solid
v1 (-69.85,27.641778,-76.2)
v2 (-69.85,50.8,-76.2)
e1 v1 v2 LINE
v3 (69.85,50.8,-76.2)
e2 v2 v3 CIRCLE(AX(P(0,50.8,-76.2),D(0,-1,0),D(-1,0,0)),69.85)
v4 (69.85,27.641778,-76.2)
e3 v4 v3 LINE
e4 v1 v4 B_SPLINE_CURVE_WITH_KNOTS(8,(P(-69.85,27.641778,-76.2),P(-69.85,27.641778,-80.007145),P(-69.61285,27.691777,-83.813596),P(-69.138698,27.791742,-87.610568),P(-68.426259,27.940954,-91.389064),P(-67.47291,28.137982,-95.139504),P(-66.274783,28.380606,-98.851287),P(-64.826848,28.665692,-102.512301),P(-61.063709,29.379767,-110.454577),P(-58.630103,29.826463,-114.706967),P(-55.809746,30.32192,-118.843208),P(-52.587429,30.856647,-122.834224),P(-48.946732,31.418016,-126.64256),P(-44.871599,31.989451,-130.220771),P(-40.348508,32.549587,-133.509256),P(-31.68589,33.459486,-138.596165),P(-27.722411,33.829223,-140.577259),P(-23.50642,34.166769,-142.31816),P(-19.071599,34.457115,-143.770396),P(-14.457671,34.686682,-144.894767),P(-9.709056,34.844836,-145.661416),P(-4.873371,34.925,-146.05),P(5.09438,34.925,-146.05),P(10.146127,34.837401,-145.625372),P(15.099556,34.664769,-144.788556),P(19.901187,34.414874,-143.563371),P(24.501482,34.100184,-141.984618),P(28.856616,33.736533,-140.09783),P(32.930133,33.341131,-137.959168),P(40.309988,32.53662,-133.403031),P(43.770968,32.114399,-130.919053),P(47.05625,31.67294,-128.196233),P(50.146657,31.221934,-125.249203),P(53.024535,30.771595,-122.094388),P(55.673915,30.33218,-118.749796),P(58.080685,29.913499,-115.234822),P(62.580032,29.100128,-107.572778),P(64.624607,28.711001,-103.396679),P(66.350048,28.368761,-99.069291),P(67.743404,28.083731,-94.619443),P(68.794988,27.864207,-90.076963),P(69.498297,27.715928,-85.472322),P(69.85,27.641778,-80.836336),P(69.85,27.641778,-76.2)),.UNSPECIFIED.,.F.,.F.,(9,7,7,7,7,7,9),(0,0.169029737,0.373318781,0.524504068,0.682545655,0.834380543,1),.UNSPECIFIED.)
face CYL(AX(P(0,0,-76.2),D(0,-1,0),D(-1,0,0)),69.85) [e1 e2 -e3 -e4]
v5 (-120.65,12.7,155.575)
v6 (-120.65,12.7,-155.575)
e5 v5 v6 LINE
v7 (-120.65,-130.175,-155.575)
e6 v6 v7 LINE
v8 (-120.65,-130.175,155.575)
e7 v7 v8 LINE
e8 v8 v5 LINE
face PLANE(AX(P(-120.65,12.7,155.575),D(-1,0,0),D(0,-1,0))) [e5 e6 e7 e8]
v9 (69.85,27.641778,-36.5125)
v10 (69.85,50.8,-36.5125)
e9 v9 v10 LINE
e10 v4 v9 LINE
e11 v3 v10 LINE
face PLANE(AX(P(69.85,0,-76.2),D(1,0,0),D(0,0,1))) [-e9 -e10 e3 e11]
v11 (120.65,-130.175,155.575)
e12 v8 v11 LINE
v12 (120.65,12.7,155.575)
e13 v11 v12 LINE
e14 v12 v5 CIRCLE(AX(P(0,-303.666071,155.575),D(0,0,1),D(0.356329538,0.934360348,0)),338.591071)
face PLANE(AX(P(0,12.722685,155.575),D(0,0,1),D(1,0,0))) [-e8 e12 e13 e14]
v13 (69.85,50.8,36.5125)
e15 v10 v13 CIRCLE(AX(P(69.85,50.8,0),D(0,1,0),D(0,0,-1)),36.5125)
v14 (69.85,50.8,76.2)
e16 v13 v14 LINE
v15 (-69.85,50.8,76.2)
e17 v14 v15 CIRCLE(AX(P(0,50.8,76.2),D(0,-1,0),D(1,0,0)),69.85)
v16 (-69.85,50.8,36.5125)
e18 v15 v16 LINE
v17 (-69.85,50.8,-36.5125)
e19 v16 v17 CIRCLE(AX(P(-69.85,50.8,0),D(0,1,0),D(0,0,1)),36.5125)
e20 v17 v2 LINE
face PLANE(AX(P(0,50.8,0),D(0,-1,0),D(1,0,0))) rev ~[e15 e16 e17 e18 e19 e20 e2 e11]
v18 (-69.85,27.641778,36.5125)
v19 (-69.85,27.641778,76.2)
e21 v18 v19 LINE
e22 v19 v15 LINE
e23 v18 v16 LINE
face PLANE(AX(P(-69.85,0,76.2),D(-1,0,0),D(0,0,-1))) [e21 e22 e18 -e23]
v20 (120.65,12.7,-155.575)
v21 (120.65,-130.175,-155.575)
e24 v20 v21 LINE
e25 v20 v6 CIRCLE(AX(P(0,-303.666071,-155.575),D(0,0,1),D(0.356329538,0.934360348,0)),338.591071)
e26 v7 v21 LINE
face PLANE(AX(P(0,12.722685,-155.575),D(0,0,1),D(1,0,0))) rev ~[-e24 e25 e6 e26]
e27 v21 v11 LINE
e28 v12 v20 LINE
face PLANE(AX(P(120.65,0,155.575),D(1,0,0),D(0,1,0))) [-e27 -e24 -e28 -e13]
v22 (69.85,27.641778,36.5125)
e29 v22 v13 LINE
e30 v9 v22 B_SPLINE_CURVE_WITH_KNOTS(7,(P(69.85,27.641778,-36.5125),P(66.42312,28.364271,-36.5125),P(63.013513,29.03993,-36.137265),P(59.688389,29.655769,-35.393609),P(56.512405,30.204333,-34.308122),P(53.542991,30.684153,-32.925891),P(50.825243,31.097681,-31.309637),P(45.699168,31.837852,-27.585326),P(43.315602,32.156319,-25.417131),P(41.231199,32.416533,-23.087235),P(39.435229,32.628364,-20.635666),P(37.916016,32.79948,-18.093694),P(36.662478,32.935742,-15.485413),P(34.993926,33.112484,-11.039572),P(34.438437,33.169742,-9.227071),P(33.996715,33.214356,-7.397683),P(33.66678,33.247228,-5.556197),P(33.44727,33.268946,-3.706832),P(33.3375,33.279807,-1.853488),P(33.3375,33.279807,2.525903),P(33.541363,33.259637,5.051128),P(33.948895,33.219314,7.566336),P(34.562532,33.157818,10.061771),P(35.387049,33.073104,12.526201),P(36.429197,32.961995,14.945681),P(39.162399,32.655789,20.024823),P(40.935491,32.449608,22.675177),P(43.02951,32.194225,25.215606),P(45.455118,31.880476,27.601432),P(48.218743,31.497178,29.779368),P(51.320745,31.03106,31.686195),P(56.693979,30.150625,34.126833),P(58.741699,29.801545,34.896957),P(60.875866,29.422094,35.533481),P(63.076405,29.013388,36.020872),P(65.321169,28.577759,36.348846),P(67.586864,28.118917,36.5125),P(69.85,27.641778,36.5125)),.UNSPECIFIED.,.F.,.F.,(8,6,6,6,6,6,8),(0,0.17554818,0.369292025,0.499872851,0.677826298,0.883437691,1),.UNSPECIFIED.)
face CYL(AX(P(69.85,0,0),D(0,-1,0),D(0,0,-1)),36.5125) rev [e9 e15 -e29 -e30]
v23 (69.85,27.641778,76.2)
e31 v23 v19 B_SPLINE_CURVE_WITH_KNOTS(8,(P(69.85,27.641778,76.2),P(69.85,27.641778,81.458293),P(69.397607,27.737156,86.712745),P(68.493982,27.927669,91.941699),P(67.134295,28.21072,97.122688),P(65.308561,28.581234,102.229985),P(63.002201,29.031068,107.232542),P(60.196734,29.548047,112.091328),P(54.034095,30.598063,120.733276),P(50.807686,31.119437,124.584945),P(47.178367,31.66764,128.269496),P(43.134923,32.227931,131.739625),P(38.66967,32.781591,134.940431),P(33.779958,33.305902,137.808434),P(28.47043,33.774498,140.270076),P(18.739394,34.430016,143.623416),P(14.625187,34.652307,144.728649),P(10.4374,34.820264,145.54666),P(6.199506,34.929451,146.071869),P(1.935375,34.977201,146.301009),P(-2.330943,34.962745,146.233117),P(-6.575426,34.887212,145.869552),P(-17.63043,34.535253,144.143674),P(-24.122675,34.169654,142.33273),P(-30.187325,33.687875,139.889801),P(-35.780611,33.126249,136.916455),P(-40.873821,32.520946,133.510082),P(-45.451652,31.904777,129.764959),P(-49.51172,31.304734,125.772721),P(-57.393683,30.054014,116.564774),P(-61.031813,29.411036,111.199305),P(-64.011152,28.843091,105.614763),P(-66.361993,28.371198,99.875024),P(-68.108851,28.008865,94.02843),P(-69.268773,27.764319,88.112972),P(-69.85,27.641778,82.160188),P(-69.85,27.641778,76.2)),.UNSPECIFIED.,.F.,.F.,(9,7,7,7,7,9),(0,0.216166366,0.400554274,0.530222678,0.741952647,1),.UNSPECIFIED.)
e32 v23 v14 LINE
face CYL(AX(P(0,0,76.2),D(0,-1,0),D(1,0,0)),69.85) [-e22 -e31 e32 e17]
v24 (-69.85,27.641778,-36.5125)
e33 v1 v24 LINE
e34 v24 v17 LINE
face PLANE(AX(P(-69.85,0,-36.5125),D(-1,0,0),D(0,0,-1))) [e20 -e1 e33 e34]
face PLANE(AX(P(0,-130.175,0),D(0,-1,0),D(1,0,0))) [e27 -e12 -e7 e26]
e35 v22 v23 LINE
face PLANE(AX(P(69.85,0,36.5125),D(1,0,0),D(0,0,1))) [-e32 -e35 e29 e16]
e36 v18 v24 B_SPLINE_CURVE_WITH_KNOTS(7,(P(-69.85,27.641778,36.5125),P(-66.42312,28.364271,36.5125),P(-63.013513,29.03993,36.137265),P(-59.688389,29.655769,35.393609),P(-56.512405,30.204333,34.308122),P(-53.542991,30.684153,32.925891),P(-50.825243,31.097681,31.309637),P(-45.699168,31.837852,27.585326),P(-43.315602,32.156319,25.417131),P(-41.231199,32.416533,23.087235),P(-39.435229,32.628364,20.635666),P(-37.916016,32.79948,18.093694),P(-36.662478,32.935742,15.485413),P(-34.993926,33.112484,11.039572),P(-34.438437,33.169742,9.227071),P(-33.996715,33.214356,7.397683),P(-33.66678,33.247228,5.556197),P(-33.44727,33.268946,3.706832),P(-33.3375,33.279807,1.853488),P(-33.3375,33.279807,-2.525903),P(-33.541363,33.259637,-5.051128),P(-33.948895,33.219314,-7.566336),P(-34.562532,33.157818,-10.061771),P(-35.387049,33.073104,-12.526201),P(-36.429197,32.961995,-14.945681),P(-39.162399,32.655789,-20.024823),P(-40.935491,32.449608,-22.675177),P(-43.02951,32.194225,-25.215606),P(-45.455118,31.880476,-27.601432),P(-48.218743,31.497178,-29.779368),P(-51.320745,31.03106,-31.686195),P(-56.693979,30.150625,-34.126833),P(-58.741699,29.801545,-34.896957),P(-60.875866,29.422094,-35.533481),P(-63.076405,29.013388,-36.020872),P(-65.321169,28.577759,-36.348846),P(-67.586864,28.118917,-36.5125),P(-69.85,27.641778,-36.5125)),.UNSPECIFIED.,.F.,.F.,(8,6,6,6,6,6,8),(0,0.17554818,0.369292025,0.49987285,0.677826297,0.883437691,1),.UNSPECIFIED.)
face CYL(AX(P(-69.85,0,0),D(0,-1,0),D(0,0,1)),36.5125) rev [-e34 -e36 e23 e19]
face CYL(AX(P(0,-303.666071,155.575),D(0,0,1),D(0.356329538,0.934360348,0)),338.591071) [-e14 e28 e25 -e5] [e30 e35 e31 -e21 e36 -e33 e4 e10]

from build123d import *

# Parameters (mm, degrees)
F0_W     = 241.3
F0_H     = 311.15
F1_DEPTH = 130.175
F3_DEPTH = 311.15
F5_DEPTH = 50.8


# Not quite as in the source:
# - a length typed as a fraction of an inch, garbled in the dataset ("3 / 203.2 mm" for 3/8 in), is restored


with BuildPart() as f1:
    # F0 (on Front) → F1 (new body)
    with BuildSketch(Plane.XZ):
        Rectangle(F0_W, F0_H)
    extrude(amount=F1_DEPTH)

    # F2 (on face) → F3 (join, through all)
    with BuildSketch(Plane.XY.offset(155.575)):
        with BuildLine():
            Line((-120.65, 12.7), (-120.65, 0))
            Line((-120.65, 0), (120.65, 0))
            Line((120.65, 0), (120.65, 12.7))
            ThreePointArc((120.65, 12.7), (0, 34.925), (-120.65, 12.7))
        make_face()
    extrude(amount=-F3_DEPTH)

    # F4 (on Front) → F5 (join)
    with BuildSketch(Plane.XZ):
        with BuildLine():
            Line((69.85, 36.5125), (69.85, 76.2))
            ThreePointArc((69.85, 76.2), (0, 146.05), (-69.85, 76.2))
            Line((-69.85, 76.2), (-69.85, 36.5125))
            ThreePointArc((-69.85, 36.5125), (-33.3375, 0), (-69.85, -36.5125))
            Line((-69.85, -36.5125), (-69.85, -76.2))
            ThreePointArc((-69.85, -76.2), (0, -146.05), (69.85, -76.2))
            Line((69.85, -76.2), (69.85, -36.5125))
            ThreePointArc((69.85, -36.5125), (33.3375, 0), (69.85, 36.5125))
        make_face()
    extrude(amount=-F5_DEPTH)


solid = f1.part
